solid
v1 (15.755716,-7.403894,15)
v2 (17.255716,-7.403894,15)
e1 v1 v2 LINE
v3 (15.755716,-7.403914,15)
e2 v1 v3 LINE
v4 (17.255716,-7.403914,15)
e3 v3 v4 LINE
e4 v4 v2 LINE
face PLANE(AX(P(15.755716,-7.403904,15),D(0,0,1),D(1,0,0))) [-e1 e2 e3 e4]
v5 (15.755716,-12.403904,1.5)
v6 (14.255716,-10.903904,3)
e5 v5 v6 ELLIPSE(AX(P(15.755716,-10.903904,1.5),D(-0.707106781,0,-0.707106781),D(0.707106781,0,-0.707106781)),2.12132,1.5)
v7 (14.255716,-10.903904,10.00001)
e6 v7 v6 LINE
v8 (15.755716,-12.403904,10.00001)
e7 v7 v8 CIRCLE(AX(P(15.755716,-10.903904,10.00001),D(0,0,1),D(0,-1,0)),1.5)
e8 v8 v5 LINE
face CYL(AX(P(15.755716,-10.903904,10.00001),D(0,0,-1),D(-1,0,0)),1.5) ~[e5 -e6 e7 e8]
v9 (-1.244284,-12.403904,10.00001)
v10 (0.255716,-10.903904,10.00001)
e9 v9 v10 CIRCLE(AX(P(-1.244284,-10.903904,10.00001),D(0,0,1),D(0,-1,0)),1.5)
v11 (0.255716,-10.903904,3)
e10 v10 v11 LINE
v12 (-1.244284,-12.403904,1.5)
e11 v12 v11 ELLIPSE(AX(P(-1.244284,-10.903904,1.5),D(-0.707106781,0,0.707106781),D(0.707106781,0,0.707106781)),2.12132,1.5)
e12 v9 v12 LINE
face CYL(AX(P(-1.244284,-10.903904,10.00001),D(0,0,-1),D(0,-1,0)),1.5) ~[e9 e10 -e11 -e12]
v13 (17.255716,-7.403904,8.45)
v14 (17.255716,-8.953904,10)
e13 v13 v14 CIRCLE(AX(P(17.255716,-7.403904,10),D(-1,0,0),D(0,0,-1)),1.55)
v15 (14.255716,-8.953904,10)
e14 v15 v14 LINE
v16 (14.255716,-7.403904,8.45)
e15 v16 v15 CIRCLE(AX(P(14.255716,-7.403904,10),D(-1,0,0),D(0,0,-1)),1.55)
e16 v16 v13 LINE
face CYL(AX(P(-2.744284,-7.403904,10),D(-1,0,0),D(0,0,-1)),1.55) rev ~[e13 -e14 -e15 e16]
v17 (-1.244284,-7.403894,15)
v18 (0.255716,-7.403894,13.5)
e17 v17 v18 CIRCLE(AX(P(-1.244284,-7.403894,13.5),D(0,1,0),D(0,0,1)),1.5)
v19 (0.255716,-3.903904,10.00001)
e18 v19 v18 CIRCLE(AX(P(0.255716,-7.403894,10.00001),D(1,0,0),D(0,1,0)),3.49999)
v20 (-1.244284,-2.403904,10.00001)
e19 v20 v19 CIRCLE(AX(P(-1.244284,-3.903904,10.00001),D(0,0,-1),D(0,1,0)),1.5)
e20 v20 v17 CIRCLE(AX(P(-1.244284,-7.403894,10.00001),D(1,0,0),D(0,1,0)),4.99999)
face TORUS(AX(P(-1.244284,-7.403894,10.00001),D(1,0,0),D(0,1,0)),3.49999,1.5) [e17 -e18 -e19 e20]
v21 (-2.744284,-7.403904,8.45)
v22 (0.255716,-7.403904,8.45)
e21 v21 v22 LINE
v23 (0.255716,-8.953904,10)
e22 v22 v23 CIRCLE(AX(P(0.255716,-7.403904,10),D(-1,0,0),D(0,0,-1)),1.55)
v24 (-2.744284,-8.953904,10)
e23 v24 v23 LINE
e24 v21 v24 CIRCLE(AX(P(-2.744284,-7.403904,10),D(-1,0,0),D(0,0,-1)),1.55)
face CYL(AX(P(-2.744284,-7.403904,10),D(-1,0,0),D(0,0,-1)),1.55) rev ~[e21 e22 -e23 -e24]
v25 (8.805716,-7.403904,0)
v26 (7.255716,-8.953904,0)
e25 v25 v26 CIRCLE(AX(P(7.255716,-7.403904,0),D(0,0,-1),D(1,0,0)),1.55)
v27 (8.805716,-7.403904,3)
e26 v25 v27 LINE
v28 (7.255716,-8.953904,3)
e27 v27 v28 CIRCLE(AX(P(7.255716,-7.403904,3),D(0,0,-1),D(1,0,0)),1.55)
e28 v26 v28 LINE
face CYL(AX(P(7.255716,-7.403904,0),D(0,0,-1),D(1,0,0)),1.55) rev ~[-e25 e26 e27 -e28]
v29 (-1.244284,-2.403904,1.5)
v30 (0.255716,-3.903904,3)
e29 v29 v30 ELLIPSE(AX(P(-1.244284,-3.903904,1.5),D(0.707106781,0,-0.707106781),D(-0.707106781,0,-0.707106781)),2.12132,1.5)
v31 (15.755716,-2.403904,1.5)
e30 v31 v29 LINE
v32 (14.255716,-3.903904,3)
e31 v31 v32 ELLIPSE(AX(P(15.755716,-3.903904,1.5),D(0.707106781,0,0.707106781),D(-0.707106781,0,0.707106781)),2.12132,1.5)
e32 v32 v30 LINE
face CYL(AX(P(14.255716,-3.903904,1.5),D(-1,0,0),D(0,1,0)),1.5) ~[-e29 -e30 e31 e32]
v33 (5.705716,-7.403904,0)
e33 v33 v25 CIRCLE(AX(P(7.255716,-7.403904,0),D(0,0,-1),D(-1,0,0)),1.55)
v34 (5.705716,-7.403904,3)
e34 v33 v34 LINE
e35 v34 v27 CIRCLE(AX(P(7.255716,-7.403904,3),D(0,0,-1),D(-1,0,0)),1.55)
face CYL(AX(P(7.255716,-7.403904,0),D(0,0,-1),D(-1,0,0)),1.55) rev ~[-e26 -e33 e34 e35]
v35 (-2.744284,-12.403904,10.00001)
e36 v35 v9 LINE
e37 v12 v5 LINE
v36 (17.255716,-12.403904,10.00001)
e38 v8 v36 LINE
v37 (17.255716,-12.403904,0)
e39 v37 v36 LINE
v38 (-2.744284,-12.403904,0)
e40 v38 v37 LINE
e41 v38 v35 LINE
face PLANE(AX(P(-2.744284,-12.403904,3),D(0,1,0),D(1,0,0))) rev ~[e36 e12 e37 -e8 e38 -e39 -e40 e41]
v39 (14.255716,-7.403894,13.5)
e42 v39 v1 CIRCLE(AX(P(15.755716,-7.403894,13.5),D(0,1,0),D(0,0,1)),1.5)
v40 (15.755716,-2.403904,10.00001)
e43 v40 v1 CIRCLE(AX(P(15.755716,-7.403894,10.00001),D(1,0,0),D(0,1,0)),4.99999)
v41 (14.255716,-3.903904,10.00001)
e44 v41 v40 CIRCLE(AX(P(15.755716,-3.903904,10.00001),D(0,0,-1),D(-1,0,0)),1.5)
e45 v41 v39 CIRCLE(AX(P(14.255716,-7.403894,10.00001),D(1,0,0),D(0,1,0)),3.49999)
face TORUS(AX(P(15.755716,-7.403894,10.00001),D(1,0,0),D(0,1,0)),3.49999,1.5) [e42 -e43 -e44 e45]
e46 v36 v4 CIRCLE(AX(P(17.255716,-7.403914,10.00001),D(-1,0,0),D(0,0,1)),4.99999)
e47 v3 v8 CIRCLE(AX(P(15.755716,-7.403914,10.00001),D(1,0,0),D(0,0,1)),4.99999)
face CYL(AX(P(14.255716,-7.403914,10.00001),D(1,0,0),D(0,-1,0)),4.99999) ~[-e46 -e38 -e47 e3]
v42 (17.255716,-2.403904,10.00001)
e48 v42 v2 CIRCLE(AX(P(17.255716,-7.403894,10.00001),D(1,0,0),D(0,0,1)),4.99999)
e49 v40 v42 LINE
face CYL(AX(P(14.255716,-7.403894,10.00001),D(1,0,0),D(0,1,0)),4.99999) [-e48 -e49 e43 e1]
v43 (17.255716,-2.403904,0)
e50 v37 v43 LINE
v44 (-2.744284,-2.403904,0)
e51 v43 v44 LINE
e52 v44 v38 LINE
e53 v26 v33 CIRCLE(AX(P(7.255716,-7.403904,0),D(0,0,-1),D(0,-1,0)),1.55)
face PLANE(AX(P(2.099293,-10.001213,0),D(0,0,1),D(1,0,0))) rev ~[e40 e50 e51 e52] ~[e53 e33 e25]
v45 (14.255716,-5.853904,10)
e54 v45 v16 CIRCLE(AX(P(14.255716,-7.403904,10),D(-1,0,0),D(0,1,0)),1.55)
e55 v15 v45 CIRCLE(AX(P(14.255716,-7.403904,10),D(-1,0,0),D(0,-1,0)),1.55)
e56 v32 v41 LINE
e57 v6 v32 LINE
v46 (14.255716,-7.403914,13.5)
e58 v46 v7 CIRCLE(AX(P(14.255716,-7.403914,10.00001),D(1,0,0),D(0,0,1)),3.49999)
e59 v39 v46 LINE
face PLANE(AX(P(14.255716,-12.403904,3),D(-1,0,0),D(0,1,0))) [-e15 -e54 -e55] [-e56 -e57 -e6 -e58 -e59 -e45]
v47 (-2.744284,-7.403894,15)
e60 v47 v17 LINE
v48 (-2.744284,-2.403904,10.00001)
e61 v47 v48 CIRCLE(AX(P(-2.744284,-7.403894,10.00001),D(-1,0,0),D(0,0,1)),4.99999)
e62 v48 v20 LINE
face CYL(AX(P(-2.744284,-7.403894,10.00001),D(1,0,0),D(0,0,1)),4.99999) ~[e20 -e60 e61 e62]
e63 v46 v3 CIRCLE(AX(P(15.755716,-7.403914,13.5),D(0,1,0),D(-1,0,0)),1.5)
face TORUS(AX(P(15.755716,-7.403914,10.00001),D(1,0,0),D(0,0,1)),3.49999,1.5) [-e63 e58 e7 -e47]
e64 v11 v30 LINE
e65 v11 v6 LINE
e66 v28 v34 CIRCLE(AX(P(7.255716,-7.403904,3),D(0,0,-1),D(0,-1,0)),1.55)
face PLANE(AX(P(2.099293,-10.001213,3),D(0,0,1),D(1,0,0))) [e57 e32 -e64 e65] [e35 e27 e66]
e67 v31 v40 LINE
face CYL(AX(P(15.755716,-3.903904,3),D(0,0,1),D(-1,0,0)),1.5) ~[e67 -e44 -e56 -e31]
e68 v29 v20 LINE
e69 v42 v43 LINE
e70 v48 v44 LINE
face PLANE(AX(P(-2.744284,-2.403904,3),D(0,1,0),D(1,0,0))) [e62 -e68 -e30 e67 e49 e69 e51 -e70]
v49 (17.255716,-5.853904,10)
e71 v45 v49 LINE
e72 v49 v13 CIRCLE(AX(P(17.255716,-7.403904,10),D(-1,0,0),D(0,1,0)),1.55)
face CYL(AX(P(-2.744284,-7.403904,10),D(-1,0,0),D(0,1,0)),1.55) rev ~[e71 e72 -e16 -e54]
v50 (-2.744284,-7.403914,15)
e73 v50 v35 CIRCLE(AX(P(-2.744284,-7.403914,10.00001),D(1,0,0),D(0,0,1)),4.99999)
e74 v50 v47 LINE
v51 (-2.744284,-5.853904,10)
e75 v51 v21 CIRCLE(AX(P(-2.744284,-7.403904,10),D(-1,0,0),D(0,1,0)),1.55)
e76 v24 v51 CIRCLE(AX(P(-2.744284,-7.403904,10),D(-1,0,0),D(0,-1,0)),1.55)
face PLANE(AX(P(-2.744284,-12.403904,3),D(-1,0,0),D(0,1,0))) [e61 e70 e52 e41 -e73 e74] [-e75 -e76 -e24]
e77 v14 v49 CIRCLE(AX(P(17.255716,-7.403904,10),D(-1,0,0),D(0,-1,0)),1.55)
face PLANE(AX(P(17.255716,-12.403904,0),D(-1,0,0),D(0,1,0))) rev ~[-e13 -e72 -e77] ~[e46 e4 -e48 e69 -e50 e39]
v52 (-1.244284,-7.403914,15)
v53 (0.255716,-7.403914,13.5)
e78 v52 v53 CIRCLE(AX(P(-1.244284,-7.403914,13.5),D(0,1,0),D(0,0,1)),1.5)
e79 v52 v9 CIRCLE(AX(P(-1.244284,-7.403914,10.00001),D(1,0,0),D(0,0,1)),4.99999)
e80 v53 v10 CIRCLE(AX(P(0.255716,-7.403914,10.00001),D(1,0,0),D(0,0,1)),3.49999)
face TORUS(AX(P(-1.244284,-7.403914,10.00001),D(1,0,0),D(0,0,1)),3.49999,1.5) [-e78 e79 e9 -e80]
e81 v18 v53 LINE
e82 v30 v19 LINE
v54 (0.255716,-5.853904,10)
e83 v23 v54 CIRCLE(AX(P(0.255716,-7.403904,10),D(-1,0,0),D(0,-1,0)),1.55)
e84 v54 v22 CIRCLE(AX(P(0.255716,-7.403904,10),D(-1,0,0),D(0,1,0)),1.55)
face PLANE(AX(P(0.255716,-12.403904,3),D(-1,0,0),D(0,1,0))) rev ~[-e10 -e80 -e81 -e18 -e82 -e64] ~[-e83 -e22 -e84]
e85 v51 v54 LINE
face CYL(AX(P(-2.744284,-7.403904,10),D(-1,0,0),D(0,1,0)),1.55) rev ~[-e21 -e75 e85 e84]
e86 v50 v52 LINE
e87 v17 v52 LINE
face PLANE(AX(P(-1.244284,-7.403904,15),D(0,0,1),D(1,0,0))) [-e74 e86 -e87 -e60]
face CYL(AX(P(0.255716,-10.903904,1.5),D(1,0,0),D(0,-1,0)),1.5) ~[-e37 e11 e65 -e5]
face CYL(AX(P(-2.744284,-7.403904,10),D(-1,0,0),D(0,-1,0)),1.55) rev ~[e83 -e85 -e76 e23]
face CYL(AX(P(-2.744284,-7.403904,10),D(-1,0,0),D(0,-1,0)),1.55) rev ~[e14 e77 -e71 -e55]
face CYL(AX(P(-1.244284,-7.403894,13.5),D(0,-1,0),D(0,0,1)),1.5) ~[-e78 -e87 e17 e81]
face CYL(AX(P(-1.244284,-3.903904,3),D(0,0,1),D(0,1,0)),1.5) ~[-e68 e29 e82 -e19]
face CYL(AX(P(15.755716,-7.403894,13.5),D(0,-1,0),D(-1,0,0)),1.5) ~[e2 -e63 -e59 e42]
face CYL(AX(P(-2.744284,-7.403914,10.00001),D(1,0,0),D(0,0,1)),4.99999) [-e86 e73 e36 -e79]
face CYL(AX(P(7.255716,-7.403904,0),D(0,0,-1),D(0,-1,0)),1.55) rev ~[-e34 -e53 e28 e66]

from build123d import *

# Parameters (mm, degrees)
F1_DEPTH = 3
F2_W     = 3
F2_H     = 10
F3_DEPTH = 12
F5_DEPTH = 25
F6_R     = 4.99999
F7_R     = 1.5


# Not quite as in the source:
# - a fillet or chamfer is up to 0.001 mm smaller than in the source, because OpenCascade refuses the exact size


with BuildPart() as f1:
    # F0 (on Top) → F1 (new body)
    with BuildSketch(Plane.XY):
        with BuildLine():
            Line((5.7057162493, -7.4039038014), (-2.7442837507, -7.4039038014))
            Line((-2.7442837507, -7.4039038014), (-2.7442837507, -12.4039038014))
            Line((-2.7442837507, -12.4039038014), (7.2557162493, -12.4039038014))
            Line((7.2557162493, -12.4039038014), (7.2557162493, -8.9539038014))
            ThreePointArc((7.2557162493, -8.9539038014), (6.1597007385, -8.4999193123), (5.7057162493, -7.4039038014))
        make_face()
        with BuildLine():
            Line((17.2557162493, -2.4039038014), (-2.7442837507, -2.4039038014))
            Line((-2.7442837507, -2.4039038014), (-2.7442837507, -7.4039038014))
            Line((-2.7442837507, -7.4039038014), (5.7057162493, -7.4039038014))
            ThreePointArc((5.7057162493, -7.4039038014), (7.2557162493, -5.8539038014), (8.8057162493, -7.4039038014))
            ThreePointArc((8.8057162493, -7.4039038014), (8.3517317602, -8.4999193123), (7.2557162493, -8.9539038014))
            Line((7.2557162493, -8.9539038014), (7.2557162493, -12.4039038014))
            Line((7.2557162493, -12.4039038014), (17.2557162493, -12.4039038014))
            Line((17.2557162493, -12.4039038014), (17.2557162493, -2.4039038014))
        make_face()
    extrude(amount=F1_DEPTH)

    # F2 (on face) → F3 (join)
    with BuildSketch(Plane.XY.offset(3)):
        with Locations((-1.2442837507, -7.4039038014)):
            Rectangle(F2_W, F2_H)
        with Locations((15.7557162493, -7.4039038014)):
            Rectangle(F2_W, F2_H)
    extrude(amount=F3_DEPTH)

    # F4 (on face) → F5 (cut)
    with BuildSketch(Plane(origin=(-2.7442837507, 0, 0), x_dir=(0, -1, 0), z_dir=(-1, 0, 0))):
        with BuildLine():
            ThreePointArc((5.8539038014, 10), (6.3078882906, 8.9039844892), (7.4039038014, 8.45))
            Line((7.4039038014, 8.45), (7.4039038014, 10))
            Line((7.4039038014, 10), (5.8539038014, 10))
        make_face()
        with BuildLine():
            Line((7.4039038014, 10), (7.4039038014, 8.45))
            ThreePointArc((7.4039038014, 8.45), (8.4999193123, 8.9039844892), (8.9539038014, 10))
            ThreePointArc((8.9539038014, 10), (7.4039038014, 11.55), (5.8539038014, 10))
            Line((5.8539038014, 10), (7.4039038014, 10))
        make_face()
    extrude(amount=-F5_DEPTH, mode=Mode.SUBTRACT)

    # F6 (radius 5 in the source; OpenCascade refuses exactly that, so slightly less here)
    f6_edges = [f1.edges().sort_by_distance(p)[0] for p in [
        (-1.244284, -2.403904, 15),
        (15.755716, -2.403904, 15),
        (15.755716, -12.403904, 15),
        (-1.244284, -12.403904, 15),
    ]]
    fillet(f6_edges, radius=F6_R)

    # F7
    f7_edges = [f1.edges().sort_by_distance(p)[0] for p in [
        (7.255716, -2.403904, 3),
        (7.255716, -12.403904, 3),
        (0.255716, -10.939441, 13.535537),
        (14.255716, -3.868367, 13.535537),
    ]]
    fillet(f7_edges, radius=F7_R)


solid = f1.part
